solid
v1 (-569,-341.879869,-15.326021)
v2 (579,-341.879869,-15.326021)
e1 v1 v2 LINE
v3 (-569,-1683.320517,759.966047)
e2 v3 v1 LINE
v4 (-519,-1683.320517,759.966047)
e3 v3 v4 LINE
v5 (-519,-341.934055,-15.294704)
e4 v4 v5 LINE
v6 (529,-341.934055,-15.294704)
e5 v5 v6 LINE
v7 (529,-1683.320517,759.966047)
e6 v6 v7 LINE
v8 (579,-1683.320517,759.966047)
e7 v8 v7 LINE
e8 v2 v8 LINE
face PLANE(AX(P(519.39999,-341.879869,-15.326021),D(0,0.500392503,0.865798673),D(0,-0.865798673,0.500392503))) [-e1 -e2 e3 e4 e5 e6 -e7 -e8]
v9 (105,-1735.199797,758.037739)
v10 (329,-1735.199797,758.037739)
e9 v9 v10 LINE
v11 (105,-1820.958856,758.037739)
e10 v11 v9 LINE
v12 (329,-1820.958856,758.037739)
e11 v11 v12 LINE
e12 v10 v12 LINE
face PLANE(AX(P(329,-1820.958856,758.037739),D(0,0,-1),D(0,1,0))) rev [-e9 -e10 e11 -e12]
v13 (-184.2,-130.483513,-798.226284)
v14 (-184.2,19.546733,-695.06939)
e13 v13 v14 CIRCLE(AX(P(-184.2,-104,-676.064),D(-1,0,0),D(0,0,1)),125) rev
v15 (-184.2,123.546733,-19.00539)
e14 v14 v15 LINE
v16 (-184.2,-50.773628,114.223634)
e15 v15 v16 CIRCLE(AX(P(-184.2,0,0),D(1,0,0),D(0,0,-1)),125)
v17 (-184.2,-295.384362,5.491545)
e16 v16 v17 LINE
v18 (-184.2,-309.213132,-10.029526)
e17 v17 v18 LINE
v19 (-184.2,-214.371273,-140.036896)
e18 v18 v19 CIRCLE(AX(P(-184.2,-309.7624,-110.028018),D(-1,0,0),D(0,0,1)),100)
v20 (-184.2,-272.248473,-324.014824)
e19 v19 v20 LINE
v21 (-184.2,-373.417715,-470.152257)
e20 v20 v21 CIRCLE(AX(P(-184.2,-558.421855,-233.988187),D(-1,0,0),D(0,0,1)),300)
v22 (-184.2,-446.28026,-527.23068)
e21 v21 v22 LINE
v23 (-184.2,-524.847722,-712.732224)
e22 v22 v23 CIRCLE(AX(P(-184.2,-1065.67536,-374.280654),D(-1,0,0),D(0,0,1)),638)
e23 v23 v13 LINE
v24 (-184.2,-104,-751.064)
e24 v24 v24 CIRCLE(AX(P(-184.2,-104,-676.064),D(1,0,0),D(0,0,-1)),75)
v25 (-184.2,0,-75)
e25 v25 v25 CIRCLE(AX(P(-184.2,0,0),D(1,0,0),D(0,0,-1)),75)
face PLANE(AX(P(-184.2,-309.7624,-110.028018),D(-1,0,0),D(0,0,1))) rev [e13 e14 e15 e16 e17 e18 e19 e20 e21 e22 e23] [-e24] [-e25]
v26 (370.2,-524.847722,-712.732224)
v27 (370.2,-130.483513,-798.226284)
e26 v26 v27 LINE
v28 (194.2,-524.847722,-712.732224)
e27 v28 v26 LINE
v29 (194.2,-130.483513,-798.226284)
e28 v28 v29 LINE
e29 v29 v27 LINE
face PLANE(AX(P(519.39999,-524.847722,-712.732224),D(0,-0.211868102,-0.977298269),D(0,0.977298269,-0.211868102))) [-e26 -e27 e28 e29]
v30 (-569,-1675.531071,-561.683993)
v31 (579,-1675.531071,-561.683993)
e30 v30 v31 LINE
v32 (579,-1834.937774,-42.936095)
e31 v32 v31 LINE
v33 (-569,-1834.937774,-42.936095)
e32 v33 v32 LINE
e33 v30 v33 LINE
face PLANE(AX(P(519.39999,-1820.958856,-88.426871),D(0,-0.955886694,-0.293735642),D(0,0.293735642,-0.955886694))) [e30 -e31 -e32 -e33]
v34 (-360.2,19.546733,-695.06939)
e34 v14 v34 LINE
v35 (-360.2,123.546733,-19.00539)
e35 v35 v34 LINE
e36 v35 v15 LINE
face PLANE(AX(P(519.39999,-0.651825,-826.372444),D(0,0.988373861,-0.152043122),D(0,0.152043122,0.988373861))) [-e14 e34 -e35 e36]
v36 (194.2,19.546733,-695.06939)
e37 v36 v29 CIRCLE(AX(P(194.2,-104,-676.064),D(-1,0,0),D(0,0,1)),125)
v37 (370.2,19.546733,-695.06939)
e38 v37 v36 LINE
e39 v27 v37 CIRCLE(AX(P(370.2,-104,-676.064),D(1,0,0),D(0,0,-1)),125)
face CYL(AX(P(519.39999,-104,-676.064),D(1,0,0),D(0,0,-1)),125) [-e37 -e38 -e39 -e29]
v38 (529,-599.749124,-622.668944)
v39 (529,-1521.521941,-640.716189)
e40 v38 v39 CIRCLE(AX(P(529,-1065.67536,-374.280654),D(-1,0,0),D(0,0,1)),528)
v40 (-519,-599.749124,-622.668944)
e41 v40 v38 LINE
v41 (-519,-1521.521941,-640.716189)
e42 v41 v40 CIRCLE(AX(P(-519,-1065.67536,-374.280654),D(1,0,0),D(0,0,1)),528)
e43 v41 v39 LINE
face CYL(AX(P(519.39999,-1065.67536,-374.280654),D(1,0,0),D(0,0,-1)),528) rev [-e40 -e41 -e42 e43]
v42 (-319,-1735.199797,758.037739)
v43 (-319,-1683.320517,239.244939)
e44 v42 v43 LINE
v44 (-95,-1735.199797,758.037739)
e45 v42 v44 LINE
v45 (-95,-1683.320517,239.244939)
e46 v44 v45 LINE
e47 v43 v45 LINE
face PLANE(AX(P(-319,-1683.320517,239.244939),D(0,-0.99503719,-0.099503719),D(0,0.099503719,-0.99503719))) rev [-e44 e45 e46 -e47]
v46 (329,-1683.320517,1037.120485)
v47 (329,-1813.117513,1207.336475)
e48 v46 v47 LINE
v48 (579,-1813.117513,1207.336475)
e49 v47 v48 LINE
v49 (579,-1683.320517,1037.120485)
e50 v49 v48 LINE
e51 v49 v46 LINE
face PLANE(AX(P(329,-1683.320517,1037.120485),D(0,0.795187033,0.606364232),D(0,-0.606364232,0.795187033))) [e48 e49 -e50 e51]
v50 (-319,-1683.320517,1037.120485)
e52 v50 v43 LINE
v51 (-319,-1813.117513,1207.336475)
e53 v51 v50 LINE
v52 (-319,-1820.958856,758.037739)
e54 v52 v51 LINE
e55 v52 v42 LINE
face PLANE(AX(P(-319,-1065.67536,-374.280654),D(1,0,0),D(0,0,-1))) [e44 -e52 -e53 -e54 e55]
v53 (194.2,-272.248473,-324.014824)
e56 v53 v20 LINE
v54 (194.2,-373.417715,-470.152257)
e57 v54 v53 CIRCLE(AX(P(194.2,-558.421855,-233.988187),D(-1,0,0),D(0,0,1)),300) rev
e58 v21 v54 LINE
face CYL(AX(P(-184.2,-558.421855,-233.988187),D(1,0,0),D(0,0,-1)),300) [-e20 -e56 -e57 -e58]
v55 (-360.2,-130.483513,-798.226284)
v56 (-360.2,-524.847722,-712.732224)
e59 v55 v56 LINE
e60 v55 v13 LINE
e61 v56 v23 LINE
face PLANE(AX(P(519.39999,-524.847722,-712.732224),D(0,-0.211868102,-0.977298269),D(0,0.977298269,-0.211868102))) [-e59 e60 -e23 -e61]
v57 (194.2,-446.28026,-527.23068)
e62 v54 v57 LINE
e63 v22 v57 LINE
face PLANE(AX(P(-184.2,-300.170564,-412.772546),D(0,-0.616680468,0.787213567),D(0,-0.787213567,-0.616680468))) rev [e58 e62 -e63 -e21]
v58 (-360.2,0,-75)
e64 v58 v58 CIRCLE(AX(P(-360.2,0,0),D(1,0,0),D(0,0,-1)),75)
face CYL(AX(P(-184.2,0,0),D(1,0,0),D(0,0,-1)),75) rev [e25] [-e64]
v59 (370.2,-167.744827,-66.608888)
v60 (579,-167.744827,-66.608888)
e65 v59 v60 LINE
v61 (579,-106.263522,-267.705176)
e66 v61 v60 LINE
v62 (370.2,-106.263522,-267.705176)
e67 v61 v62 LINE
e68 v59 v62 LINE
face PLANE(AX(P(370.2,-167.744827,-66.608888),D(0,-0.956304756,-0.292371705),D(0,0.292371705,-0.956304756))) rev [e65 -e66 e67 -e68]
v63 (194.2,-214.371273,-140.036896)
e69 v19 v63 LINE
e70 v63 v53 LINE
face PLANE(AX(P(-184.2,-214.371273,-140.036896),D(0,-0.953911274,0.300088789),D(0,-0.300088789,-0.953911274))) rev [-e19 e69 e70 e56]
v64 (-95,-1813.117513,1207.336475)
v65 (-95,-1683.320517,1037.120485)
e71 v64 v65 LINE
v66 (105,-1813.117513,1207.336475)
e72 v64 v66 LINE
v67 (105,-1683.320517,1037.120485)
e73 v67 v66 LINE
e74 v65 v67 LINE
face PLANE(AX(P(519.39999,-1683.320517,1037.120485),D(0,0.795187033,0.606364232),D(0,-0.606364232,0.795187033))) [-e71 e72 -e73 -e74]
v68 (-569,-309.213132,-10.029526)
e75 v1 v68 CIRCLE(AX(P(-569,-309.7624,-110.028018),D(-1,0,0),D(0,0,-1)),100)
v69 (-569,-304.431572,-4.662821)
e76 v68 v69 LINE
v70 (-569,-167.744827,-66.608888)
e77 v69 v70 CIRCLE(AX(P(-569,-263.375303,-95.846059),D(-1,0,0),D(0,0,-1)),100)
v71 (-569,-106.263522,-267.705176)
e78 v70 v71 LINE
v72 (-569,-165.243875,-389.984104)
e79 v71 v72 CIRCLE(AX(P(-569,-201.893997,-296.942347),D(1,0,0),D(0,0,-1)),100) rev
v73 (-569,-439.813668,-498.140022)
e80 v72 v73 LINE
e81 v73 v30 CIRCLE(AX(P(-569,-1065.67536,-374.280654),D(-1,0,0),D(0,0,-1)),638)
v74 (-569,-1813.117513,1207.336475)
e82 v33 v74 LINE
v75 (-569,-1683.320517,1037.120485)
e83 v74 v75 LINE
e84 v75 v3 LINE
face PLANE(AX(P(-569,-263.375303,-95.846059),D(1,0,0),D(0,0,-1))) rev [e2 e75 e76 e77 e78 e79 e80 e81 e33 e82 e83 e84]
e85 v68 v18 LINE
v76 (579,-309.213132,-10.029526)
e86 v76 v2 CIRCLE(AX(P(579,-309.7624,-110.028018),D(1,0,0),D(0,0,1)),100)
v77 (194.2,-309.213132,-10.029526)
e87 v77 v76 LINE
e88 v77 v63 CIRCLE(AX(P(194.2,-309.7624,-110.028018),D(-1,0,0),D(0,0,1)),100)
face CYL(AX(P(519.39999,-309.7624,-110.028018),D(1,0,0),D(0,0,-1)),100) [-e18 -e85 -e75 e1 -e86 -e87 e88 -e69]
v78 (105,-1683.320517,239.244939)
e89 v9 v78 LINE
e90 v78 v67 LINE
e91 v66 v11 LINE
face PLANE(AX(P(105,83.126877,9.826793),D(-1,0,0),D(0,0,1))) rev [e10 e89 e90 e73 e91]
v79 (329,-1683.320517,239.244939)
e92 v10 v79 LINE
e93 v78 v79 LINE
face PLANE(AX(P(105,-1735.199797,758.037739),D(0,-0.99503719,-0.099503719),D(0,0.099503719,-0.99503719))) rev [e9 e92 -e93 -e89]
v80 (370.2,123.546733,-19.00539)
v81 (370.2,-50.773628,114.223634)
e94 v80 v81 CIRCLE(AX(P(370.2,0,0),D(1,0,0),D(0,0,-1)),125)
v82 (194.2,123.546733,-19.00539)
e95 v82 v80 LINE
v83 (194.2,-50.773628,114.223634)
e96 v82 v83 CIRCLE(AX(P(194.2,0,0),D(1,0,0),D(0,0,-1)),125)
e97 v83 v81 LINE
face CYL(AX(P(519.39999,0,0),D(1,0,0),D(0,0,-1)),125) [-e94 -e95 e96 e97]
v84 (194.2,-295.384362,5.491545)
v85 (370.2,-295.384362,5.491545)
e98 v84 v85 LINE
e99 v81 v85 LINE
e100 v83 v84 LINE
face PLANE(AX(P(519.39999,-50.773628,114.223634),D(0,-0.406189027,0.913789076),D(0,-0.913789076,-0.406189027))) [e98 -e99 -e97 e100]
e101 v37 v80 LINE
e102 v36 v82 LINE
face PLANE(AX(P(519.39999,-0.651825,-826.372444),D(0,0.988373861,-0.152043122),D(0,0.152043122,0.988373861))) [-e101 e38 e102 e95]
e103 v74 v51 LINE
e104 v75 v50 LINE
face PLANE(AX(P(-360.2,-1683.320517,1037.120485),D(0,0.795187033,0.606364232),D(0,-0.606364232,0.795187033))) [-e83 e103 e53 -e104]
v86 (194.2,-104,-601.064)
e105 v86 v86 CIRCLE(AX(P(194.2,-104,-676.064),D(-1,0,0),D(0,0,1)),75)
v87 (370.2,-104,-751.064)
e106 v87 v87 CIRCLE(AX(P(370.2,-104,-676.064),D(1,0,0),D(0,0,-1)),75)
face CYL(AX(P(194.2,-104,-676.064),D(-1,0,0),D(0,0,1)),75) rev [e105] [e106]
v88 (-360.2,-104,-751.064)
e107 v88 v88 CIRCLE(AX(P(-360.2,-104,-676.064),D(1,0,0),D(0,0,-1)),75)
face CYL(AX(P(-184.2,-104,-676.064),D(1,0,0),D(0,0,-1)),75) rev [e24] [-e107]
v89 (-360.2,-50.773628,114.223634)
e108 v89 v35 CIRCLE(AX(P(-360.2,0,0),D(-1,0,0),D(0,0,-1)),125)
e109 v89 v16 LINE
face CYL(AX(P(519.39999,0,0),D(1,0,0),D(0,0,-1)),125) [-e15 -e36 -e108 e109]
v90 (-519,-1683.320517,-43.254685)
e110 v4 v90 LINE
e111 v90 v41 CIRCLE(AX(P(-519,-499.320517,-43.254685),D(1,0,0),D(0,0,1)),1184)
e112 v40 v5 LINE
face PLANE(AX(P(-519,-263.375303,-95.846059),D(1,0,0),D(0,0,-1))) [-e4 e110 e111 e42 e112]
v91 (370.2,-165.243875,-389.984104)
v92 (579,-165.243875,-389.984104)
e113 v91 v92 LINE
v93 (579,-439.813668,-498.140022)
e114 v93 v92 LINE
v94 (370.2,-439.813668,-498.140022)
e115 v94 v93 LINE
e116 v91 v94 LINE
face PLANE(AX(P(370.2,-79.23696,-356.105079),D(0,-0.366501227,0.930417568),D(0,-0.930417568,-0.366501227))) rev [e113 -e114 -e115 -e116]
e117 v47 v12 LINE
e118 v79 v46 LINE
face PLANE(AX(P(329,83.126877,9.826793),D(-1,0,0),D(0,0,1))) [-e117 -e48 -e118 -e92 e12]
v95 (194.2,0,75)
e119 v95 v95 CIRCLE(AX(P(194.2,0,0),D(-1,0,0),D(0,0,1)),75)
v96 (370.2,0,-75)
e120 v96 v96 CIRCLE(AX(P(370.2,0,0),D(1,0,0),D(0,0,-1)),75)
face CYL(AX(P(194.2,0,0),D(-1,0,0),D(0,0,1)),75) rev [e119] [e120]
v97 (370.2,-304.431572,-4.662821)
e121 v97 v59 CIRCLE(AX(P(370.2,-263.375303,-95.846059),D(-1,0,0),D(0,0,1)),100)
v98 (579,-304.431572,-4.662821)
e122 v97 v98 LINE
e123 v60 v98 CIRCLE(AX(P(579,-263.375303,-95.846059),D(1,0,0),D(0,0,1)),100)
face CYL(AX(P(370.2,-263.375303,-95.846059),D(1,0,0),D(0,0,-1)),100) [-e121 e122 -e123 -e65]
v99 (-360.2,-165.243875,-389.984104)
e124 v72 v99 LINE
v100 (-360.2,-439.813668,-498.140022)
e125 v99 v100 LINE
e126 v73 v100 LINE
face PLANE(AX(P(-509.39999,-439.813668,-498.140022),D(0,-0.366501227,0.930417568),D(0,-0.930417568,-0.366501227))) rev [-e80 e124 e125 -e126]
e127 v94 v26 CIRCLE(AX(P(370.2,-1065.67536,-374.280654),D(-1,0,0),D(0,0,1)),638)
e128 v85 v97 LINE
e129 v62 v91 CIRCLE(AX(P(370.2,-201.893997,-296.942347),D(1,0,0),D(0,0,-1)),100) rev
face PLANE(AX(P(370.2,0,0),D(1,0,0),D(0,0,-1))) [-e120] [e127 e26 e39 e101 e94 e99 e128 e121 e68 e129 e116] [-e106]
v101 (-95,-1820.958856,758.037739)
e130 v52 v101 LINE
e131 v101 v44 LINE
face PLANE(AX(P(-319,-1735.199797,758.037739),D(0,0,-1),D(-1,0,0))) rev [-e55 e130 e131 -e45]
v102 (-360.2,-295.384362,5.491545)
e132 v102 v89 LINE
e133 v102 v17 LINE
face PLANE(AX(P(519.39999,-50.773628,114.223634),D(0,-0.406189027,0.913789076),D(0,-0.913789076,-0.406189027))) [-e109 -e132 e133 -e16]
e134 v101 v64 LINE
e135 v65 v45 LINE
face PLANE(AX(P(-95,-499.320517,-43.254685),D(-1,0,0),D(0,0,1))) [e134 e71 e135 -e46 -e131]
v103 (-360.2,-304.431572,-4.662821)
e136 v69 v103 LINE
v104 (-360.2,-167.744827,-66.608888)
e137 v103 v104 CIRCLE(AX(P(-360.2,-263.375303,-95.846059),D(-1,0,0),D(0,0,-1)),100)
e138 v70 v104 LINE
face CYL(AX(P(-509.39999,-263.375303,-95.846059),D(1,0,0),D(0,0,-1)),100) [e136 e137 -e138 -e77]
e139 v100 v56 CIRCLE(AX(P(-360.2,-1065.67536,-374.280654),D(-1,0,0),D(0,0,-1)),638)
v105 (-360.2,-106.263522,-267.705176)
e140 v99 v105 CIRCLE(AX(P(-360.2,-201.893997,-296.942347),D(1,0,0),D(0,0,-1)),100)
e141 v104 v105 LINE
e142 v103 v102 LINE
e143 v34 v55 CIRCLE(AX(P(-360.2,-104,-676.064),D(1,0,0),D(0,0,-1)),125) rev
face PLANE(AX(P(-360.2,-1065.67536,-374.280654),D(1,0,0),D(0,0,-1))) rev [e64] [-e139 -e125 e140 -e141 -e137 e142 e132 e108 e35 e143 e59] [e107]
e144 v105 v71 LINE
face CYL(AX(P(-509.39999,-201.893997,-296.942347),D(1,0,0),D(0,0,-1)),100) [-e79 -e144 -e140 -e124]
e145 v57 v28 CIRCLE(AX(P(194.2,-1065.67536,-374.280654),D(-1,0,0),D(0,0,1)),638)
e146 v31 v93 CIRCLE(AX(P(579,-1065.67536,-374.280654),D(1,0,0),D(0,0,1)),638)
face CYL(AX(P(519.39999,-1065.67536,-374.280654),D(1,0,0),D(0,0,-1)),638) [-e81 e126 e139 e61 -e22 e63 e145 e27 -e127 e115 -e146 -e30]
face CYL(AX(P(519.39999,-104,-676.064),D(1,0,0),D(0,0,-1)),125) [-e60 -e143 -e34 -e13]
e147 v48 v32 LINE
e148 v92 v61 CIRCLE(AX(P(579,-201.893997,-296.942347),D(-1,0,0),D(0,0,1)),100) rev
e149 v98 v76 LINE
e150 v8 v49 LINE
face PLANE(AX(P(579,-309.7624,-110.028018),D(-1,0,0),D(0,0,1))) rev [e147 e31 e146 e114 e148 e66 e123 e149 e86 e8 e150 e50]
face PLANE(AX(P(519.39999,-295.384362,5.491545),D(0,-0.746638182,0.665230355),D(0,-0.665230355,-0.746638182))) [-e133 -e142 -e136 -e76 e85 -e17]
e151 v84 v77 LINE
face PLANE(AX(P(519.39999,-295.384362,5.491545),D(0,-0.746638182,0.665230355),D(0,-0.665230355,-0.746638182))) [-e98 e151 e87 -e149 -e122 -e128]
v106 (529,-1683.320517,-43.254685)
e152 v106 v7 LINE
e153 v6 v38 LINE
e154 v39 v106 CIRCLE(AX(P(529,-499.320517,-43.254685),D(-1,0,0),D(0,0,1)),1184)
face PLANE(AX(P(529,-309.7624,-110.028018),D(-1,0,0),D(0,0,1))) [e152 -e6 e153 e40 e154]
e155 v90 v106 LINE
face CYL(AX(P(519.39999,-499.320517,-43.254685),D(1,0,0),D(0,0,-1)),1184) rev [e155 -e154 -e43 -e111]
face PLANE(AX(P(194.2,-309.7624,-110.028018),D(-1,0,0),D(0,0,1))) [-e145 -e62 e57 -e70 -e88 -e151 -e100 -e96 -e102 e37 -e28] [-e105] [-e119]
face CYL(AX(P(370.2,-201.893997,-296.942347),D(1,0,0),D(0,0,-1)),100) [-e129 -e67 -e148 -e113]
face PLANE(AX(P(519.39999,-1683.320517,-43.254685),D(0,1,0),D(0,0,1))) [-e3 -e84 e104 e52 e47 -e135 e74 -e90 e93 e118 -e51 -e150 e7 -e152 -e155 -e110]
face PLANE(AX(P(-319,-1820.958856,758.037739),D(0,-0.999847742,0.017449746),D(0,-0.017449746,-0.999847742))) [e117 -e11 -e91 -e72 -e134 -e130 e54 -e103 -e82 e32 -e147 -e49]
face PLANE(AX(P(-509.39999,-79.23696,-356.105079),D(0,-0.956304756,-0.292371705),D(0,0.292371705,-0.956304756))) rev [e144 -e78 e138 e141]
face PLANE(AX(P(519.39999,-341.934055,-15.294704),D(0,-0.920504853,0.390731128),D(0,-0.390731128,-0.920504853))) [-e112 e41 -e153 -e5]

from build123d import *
from build123d.topology import SkipClean

# Parameters (mm, degrees)
BOSS_EXTRUDE1_DEPTH   = 9.600009513678287
BOSS_EXTRUDE2_DEPTH   = 514.3999904863157
CUT_EXTRUDE1_DEPTH    = 199.99999999999986
CUT_EXTRUDE2_DEPTH    = 224.00000000000003
BOSS_EXTRUDE3_DEPTH   = 100.00000000000634
BOSS_EXTRUDE4_DEPTH   = 223.9999999999994
BOSS_EXTRUDE5_DEPTH   = 41.20000000000044
CUT_EXTRUDE3_DEPTH    = 158.79999999999976
BOSS_EXTRUDE6_DEPTH   = 149.19999048631087
CUT_EXTRUDE4_DEPTH    = 378.3999999999982
BOSS_EXTRUDE7_DEPTH   = 9.600009513685004
BOSS_EXTRUDE8_DEPTH   = 49.99999999999939
BOSS_EXTRUDE9_DEPTH   = 279.08274569611746
BOSS_EXTRUDE10_START  = 50.00000000000021
BOSS_EXTRUDE10_DEPTH  = 50.00000000000021
DRAFT1_START          = -793
DRAFT1_DEPTH          = 1150
DRAFT1_START_2        = -791.766847587
DRAFT1_2_DEPTH        = 1148
DRAFT2_ANGLE          = 52.67292498717598
HOLE1_AT_2_COUNT      = 2
HOLE1_AT_2_PITCH      = 684.016470632103
HOLE2_D               = 150
HOLE2_DEPTH           = 384.8
FILLET1_R             = 100.00000000000001
FILLET2_R             = 125
FILLET3_R             = 300
BODY_MOVE_COPY3_ANGLE = 90.0000000000002
BODY_MOVE_COPY4_ANGLE = 120.00000000000021


with BuildPart() as part:
    # Sketch1 → Boss-Extrude1 (new body)
    with BuildSketch(Plane.XY.offset(306.2331524125839)):
        with BuildLine():
            Line((53.08147760316467, -1766.447394034807), (-1027.2936921096916, -1766.4473940348073))
            Line((-1027.2936921096916, -1766.4473940348073), (-1027.2936921096916, -1904.0857327222143))
            Line((-1027.2936921096916, -1904.0857327222143), (98.25366379894766, -1904.0857327222143))
            Line((98.25366379894766, -1904.0857327222143), (571.5107857447487, -1758.657947920252))
            ThreePointArc((571.5107857447487, -1758.657947920252), (1016.6806746482655, -1231.839040201803), (722.5590166804343, -607.9745983313888))
            Line((722.5590166804343, -607.9745983313888), (836.1992361834356, -83.77870158177328))
            Line((836.1992361834356, -83.77870158177328), (28.832182943648764, 40.41985585796329))
            ThreePointArc((28.832182943648764, 40.41985585796329), (-89.48849099605702, -7.222499827583533), (-104.39684181466816, -133.9005050719176))
            Line((-104.39684181466816, -133.9005050719176), (4.335247948888093, -378.51123875566793))
            Line((4.335247948888093, -378.51123875566793), (19.856318658240184, -392.340008322466))
            ThreePointArc((19.856318658240184, -392.340008322466), (21.14387371916233, -408.89399605142665), (25.152813367140993, -425.0067459925245))
            Line((25.152813367140993, -425.0067459925245), (25.121496409919185, -425.06093181631854))
            Line((25.121496409919185, -425.06093181631854), (632.4957363404607, -682.8760006812848))
            ThreePointArc((632.4957363404607, -682.8760006812848), (912.0062760274534, -1138.4665882307247), (650.5429820351718, -1604.6488177874323))
            ThreePointArc((650.5429820351718, -1604.6488177874323), (362.57260370932397, -1725.2821339957313), (53.08147760316467, -1766.447394034807))
        make_face()
    extrude(amount=-BOSS_EXTRUDE1_DEPTH)

    # Sketch2 → Boss-Extrude2 (add)
    with SkipClean():  # the faces are left unmerged after this step: merging them gives an invalid solid
        with BuildSketch(Plane(origin=(0, 0, 296.6331428989056), x_dir=(-1, 0, 0), z_dir=(0, 0, -1))):
            with BuildLine():
                Line((-53.08147763303338, -1766.4473939156126), (1027.293692098456, -1766.4473939156126))
                Line((1027.293692098456, -1766.4473939156126), (1027.293692098456, -1904.0857326059793))
                Line((1027.293692098456, -1904.0857326059793), (-98.2536638101782, -1904.0857326059797))
                Line((-98.2536638101782, -1904.0857326059797), (-571.5107857559829, -1758.6579478040192))
                ThreePointArc((-571.5107857559829, -1758.6579478040192), (-1016.6806746151524, -1231.8390401398947), (-722.5590166804387, -607.9745983313868))
                Line((-722.5590166804387, -607.9745983313868), (-836.1992361834398, -83.77870158177345))
                Line((-836.1992361834398, -83.77870158177345), (-28.832182943652366, 40.41985585796323))
                ThreePointArc((-28.832182943652366, 40.41985585796323), (89.4884909960535, -7.222499827583732), (104.39684181466478, -133.90050507191813))
                Line((104.39684181466478, -133.90050507191813), (-4.335247948891731, -378.51123875566793))
                Line((-4.335247948891731, -378.51123875566793), (-19.856318658241946, -392.340008322466))
                ThreePointArc((-19.856318658241946, -392.340008322466), (-21.14387371916395, -408.8939960514259), (-25.152813367143864, -425.0067459925226))
                Line((-25.152813367143864, -425.0067459925226), (-25.121496409920812, -425.0609318163162))
                Line((-25.121496409920812, -425.0609318163162), (-632.4957363404753, -682.8760006812888))
                ThreePointArc((-632.4957363404753, -682.8760006812888), (-912.0062759939467, -1138.4665881761014), (-650.5429820330173, -1604.6488176769096))
                ThreePointArc((-650.5429820330173, -1604.6488176769096), (-362.57260372260464, -1725.282133878744), (-53.08147763303338, -1766.4473939156126))
            make_face()
        extrude(amount=BOSS_EXTRUDE2_DEPTH)

    # Sketch3 → Cut-Extrude1 (cut)
    with SkipClean():  # the faces are left unmerged after this step: merging them gives an invalid solid
        with BuildSketch(Plane.XY.offset(306.2331524125839)):
            Polygon((-1027.29369209846, -1904.085732605916), (-748.21094640232, -1904.0857326059318), (-748.2109464023167, -1766.44739383907), (-1027.2936920984598, -1766.4473938390806), align=None)
        extrude(amount=-CUT_EXTRUDE1_DEPTH, mode=Mode.SUBTRACT)

    # Sketch4 → Cut-Extrude2 (cut)
    with SkipClean():  # the faces are left unmerged after this step: merging them gives an invalid solid
        with BuildSketch(Plane.XY.offset(106.23315241258402)):
            Polygon((-229.4181464023195, -1766.4473938390802), (-1027.2936920984598, -1766.4473938390806), (-1027.29369209846, -1904.085732605916), (-748.21094640232, -1904.0857326059318), (-748.2109464023184, -1818.3266738390705), align=None)
        extrude(amount=-CUT_EXTRUDE2_DEPTH, mode=Mode.SUBTRACT)

    # Sketch5 → Boss-Extrude3 (add)
    with BuildSketch(Plane(origin=(0, 0, -217.7668475874101), x_dir=(-1, 0, 0), z_dir=(0, 0, -1))):
        with BuildLine():
            Line((-53.081477633029785, -1766.4473939156126), (1027.2936920984594, -1766.4473939156126))
            Line((1027.2936920984594, -1766.4473939156126), (1027.2936920984594, -1904.0857326059793))
            Line((1027.2936920984594, -1904.0857326059793), (-98.2536638101746, -1904.0857326059797))
            Line((-98.2536638101746, -1904.0857326059797), (-571.5107857559792, -1758.6579478040192))
            ThreePointArc((-571.5107857559792, -1758.6579478040192), (-1016.6806746151486, -1231.8390401398945), (-722.5590166804352, -607.9745983313868))
            Line((-722.5590166804352, -607.9745983313868), (-836.1992361834363, -83.77870158177345))
            Line((-836.1992361834363, -83.77870158177345), (-28.832182943648775, 40.41985585796323))
            ThreePointArc((-28.832182943648775, 40.41985585796323), (89.4884909960571, -7.222499827583732), (104.39684181466838, -133.90050507191813))
            Line((104.39684181466838, -133.90050507191813), (-4.3352479488881395, -378.51123875566793))
            Line((-4.3352479488881395, -378.51123875566793), (-19.856318658238703, -392.340008322466))
            ThreePointArc((-19.856318658238703, -392.340008322466), (-21.14387371916071, -408.89399605142586), (-25.152813367140272, -425.0067459925226))
            Line((-25.152813367140272, -425.0067459925226), (-25.12149640991722, -425.0609318163162))
            Line((-25.12149640991722, -425.0609318163162), (-632.4957363404717, -682.8760006812888))
            ThreePointArc((-632.4957363404717, -682.8760006812888), (-912.0062759939432, -1138.4665881761014), (-650.5429820330137, -1604.6488176769096))
            ThreePointArc((-650.5429820330137, -1604.6488176769096), (-362.57260372260106, -1725.282133878744), (-53.081477633029785, -1766.4473939156126))
        make_face()
    extrude(amount=BOSS_EXTRUDE3_DEPTH)

    # Sketch6 → Boss-Extrude4 (add)
    with SkipClean():  # the faces are left unmerged after this step: merging them gives an invalid solid
        with BuildSketch(Plane(origin=(0, 0, -317.76684758741646), x_dir=(-1, 0, 0), z_dir=(0, 0, -1))):
            with BuildLine():
                Line((-53.081477633029195, -1766.4473939156128), (229.4181463204047, -1766.4473939156128))
                Line((229.4181463204047, -1766.4473939156128), (748.2109463203855, -1818.3266739156131))
                Line((748.2109463203855, -1818.3266739156131), (748.2109463203855, -1904.0857326059795))
                Line((748.2109463203855, -1904.0857326059795), (-98.2536638101739, -1904.0857326059797))
                Line((-98.2536638101739, -1904.0857326059797), (-571.5107857559785, -1758.6579478040192))
                ThreePointArc((-571.5107857559785, -1758.6579478040192), (-1016.6806746151481, -1231.8390401398947), (-722.5590166804345, -607.9745983313868))
                Line((-722.5590166804345, -607.9745983313868), (-836.1992361834356, -83.77870158177345))
                Line((-836.1992361834356, -83.77870158177345), (-28.83218294364808, 40.41985585796323))
                ThreePointArc((-28.83218294364808, 40.41985585796323), (89.48849099605779, -7.222499827583732), (104.39684181466907, -133.90050507191813))
                Line((104.39684181466907, -133.90050507191813), (-4.335247948887441, -378.51123875566793))
                Line((-4.335247948887441, -378.51123875566793), (-19.856318658238788, -392.340008322466))
                ThreePointArc((-19.856318658238788, -392.340008322466), (-21.14387371916078, -408.89399605142575), (-25.152813367139576, -425.0067459925226))
                Line((-25.152813367139576, -425.0067459925226), (-25.121496409916524, -425.0609318163162))
                Line((-25.121496409916524, -425.0609318163162), (-632.4957363404711, -682.8760006812888))
                ThreePointArc((-632.4957363404711, -682.8760006812888), (-912.0062759939424, -1138.4665881761016), (-650.5429820330128, -1604.6488176769099))
                ThreePointArc((-650.5429820330128, -1604.6488176769099), (-362.5726037226002, -1725.282133878744), (-53.081477633029195, -1766.4473939156128))
            make_face()
        extrude(amount=BOSS_EXTRUDE4_DEPTH)

    # Sketch7 → Boss-Extrude5 (add)
    with BuildSketch(Plane(origin=(0, 0, -541.7668475874159), x_dir=(-1, 0, 0), z_dir=(0, 0, -1))):
        with BuildLine():
            Line((-722.5590166804329, -607.9745983313868), (-836.1992361834341, -83.77870158177345))
            Line((-836.1992361834341, -83.77870158177345), (-28.83218294364651, 40.41985585796323))
            ThreePointArc((-28.83218294364651, 40.41985585796323), (89.48849099605935, -7.222499827583732), (104.39684181467064, -133.90050507191813))
            Line((104.39684181467064, -133.90050507191813), (-4.335247948885877, -378.51123875566793))
            Line((-4.335247948885877, -378.51123875566793), (-19.856318658237367, -392.340008322466))
            ThreePointArc((-19.856318658237367, -392.340008322466), (-21.14387371915936, -408.89399605142575), (-25.15281336713801, -425.0067459925226))
            Line((-25.15281336713801, -425.0067459925226), (-25.12149640991496, -425.0609318163162))
            Line((-25.12149640991496, -425.0609318163162), (-632.4957363404695, -682.8760006812888))
            ThreePointArc((-632.4957363404695, -682.8760006812888), (-912.0062759939407, -1138.4665881761018), (-650.5429820330108, -1604.6488176769099))
            ThreePointArc((-650.5429820330108, -1604.6488176769099), (-362.57260372259833, -1725.282133878744), (-53.081477633027575, -1766.4473939156126))
            Line((-53.081477633027575, -1766.4473939156126), (1027.2936920984582, -1766.4473939156126))
            Line((1027.2936920984582, -1766.4473939156126), (1027.2936920984582, -1904.0857326059793))
            Line((1027.2936920984582, -1904.0857326059793), (-98.25366381017234, -1904.0857326059797))
            Line((-98.25366381017234, -1904.0857326059797), (-571.510785755977, -1758.6579478040192))
            ThreePointArc((-571.510785755977, -1758.6579478040192), (-1016.6806746151462, -1231.8390401398947), (-722.5590166804329, -607.9745983313868))
        make_face()
    extrude(amount=BOSS_EXTRUDE5_DEPTH)

    # Sketch8 → Cut-Extrude3 (cut)
    with BuildSketch(Plane.XY.offset(306.2331524125839)):
        with BuildLine():
            Line((-104.39684181466816, -133.9005050719176), (4.335247948888093, -378.51123875566793))
            Line((4.335247948888093, -378.51123875566793), (14.489613985965955, -387.5584488775228))
            ThreePointArc((14.489613985965955, -387.5584488775228), (14.590003133143597, -305.2236767235862), (76.43568070724513, -250.87170390730495))
            Line((76.43568070724513, -250.87170390730495), (365.9318713497288, -162.3638362624787))
            Line((365.9318713497288, -162.3638362624787), (507.9668142543914, -522.9405451781555))
            ThreePointArc((507.9668142543914, -522.9405451781555), (619.1405258320616, -555.6720221138472), (722.5590166804343, -607.9745983313888))
            Line((722.5590166804343, -607.9745983313888), (836.1992361834356, -83.77870158177328))
            Line((836.1992361834356, -83.77870158177328), (28.832182943648764, 40.41985585796329))
            ThreePointArc((28.832182943648764, 40.41985585796329), (-89.48849099605702, -7.222499827583533), (-104.39684181466816, -133.9005050719176))
        make_face()
    extrude(amount=-CUT_EXTRUDE3_DEPTH, mode=Mode.SUBTRACT)

    # Sketch9 → Boss-Extrude6 (add)
    with BuildSketch(Plane(origin=(0, 0, -582.9668475874164), x_dir=(-1, 0, 0), z_dir=(0, 0, -1))):
        with BuildLine():
            Line((-25.1528133969194, -425.00674593665815), (-25.121496439696347, -425.0609317604518))
            Line((-25.121496439696347, -425.0609317604518), (-632.4957363702508, -682.8760006254245))
            ThreePointArc((-632.4957363702508, -682.8760006254245), (-912.0062760572353, -1138.4665881748622), (-650.5429820649566, -1604.6488177315662))
            ThreePointArc((-650.5429820649566, -1604.6488177315662), (-362.5726037391466, -1725.2821339398504), (-53.08147763302735, -1766.4473939789204))
            Line((-53.08147763302735, -1766.4473939789204), (1027.2936920984585, -1766.4473939789204))
            Line((1027.2936920984585, -1766.4473939789204), (1027.2936920984585, -1904.0857326059793))
            Line((1027.2936920984585, -1904.0857326059793), (-98.25366381017204, -1904.0857326059797))
            Line((-98.25366381017204, -1904.0857326059797), (-571.5107857559767, -1758.6579478040192))
            ThreePointArc((-571.5107857559767, -1758.6579478040192), (-1021.2655844178603, -1116.037821102927), (-507.96681425438925, -522.9405451781541))
            Line((-507.96681425438925, -522.9405451781541), (-365.93187134972715, -162.36383626247863))
            Line((-365.93187134972715, -162.36383626247863), (-76.43568075553172, -250.8717038925416))
            ThreePointArc((-76.43568075553172, -250.8717038925416), (-14.59000319073344, -305.2236766882949), (-14.48961401574584, -387.55844882165815))
            Line((-14.48961401574584, -387.55844882165815), (-19.856318688019385, -392.3400082666016))
            ThreePointArc((-19.856318688019385, -392.3400082666016), (-21.143873748941374, -408.89399599556117), (-25.1528133969194, -425.00674593665815))
        make_face()
    extrude(amount=BOSS_EXTRUDE6_DEPTH)

    # Sketch10 → Cut-Extrude4 (cut)
    with BuildSketch(Plane.XY.offset(-28.56684758741631)):
        with BuildLine():
            Line((149.86368907718216, -297.4981497888479), (422.5993383847587, -383.2974405420883))
            Line((422.5993383847587, -383.2974405420883), (537.0574725944384, -529.407137109236))
            ThreePointArc((537.0574725944384, -529.407137109236), (632.9288557363569, -561.3229552494635), (722.5590166804348, -607.9745983313883))
            Line((722.5590166804348, -607.9745983313883), (836.1992361834361, -83.77870158177348))
            Line((836.1992361834361, -83.77870158177348), (28.832182943648167, 40.41985585796329))
            ThreePointArc((28.832182943648167, 40.41985585796329), (-89.48849099605714, -7.222499827583846), (-104.39684181466868, -133.90050507191796))
            Line((-104.39684181466868, -133.90050507191796), (4.335247948887403, -378.5112387556677))
            Line((4.335247948887403, -378.5112387556677), (19.85631865823901, -392.34000832246596))
            ThreePointArc((19.85631865823901, -392.34000832246596), (60.919413328362104, -312.1017843461267), (149.86368907718216, -297.4981497888479))
        make_face()
    extrude(amount=-CUT_EXTRUDE4_DEPTH, mode=Mode.SUBTRACT)

    # Sketch11 → Boss-Extrude7 (add)
    with BuildSketch(Plane(origin=(0, 0, -732.1668380737271), x_dir=(-1, 0, 0), z_dir=(0, 0, -1))):
        with BuildLine():
            Line((-25.152813396918305, -425.00674593665826), (-25.121496439695253, -425.0609317604519))
            Line((-25.121496439695253, -425.0609317604519), (-632.4957363702498, -682.8760006254246))
            ThreePointArc((-632.4957363702498, -682.8760006254246), (-912.006276057234, -1138.4665881748624), (-650.5429820649556, -1604.6488177315662))
            ThreePointArc((-650.5429820649556, -1604.6488177315662), (-362.5726037391455, -1725.2821339398504), (-53.08147763302631, -1766.4473939789204))
            Line((-53.08147763302631, -1766.4473939789204), (1027.2936920984596, -1766.4473939789204))
            Line((1027.2936920984596, -1766.4473939789204), (1027.2936920984596, -1904.0857326059793))
            Line((1027.2936920984596, -1904.0857326059793), (-98.253663810171, -1904.0857326059797))
            Line((-98.253663810171, -1904.0857326059797), (-571.5107857559757, -1758.6579478040192))
            ThreePointArc((-571.5107857559757, -1758.6579478040192), (-1021.2655844178593, -1116.037821102927), (-507.9668142543883, -522.9405451781541))
            Line((-507.9668142543883, -522.9405451781541), (-365.9318713497261, -162.36383626247863))
            Line((-365.9318713497261, -162.36383626247863), (-76.43568075553054, -250.87170389254166))
            ThreePointArc((-76.43568075553054, -250.87170389254166), (-14.590003190732247, -305.223676688295), (-14.489614015744714, -387.55844882165826))
            Line((-14.489614015744714, -387.55844882165826), (-19.856318688018295, -392.3400082666017))
            ThreePointArc((-19.856318688018295, -392.3400082666017), (-21.14387374894028, -408.8939959955613), (-25.152813396918305, -425.00674593665826))
        make_face()
    extrude(amount=BOSS_EXTRUDE7_DEPTH)

    # Sketch12 → Boss-Extrude8 (add)
    with SkipClean():  # the faces are left unmerged after this step: merging them gives an invalid solid
        with BuildSketch(Plane(origin=(0, 0, -741.7668475874121), x_dir=(-1, 0, 0), z_dir=(0, 0, -1))):
            with BuildLine():
                Line((-365.93187134972607, -162.36383626247863), (-76.4356807072422, -250.8717039073049))
                ThreePointArc((-76.4356807072422, -250.8717039073049), (-14.590003133141124, -305.2236767235862), (-14.489613985962942, -387.55844887752255))
                Line((-14.489613985962942, -387.55844887752255), (-19.85631865823669, -392.3400083224661))
                ThreePointArc((-19.85631865823669, -392.3400083224661), (-21.143873719158677, -408.89399605142563), (-25.152813367136616, -425.0067459925226))
                Line((-25.152813367136616, -425.0067459925226), (750.1392546412519, -1766.4473938390702))
                Line((750.1392546412519, -1766.4473938390702), (1027.293692098458, -1766.4473938390702))
                Line((1027.293692098458, -1766.4473938390702), (1027.2936920984596, -1904.0857326059793))
                Line((1027.2936920984596, -1904.0857326059793), (-98.25366381017093, -1904.0857326059797))
                Line((-98.25366381017093, -1904.0857326059797), (-571.5107857559756, -1758.6579478040192))
                ThreePointArc((-571.5107857559756, -1758.6579478040192), (-1021.2655844178594, -1116.037821102927), (-507.96681425438817, -522.9405451781541))
                Line((-507.96681425438817, -522.9405451781541), (-365.93187134972607, -162.36383626247863))
            make_face()
        extrude(amount=BOSS_EXTRUDE8_DEPTH)

    # Sketch13 → Boss-Extrude9 (add)
    with BuildSketch(Plane.ZY.offset(748.2109464022755)):
        Polygon((306.2331524125839, -1904.0857326059336), (106.23315241258402, -1904.0857326059336), (106.23315241258602, -1766.4473938391052), (306.23315241258393, -1766.4473938390927), align=None)
    extrude(amount=BOSS_EXTRUDE9_DEPTH)

    # Sketch14 → Boss-Extrude10 (add)
    with BuildSketch(Plane.XY.offset(306.2331524125839).offset(BOSS_EXTRUDE10_START)):
        with BuildLine():
            Line((19.85631865824079, -392.3400083224026), (14.48961398596682, -387.5584488774589))
            ThreePointArc((14.48961398596682, -387.5584488774589), (14.590003133144805, -305.22367672352243), (76.43568070724626, -250.8717039072411))
            Line((76.43568070724626, -250.8717039072411), (365.93187134972885, -162.3638362624152))
            Line((365.93187134972885, -162.3638362624152), (507.9668142543918, -522.9405451780918))
            ThreePointArc((507.9668142543918, -522.9405451780918), (1021.265584417858, -1116.0378211028633), (571.51078575598, -1758.6579478039534))
            Line((571.51078575598, -1758.6579478039534), (98.25366381017913, -1904.0857326059158))
            Line((98.25366381017913, -1904.0857326059158), (-1027.2936920984382, -1904.085732605916))
            Line((-1027.2936920984382, -1904.085732605916), (-1027.2936920984382, -1766.4473938390063))
            Line((-1027.2936920984382, -1766.4473938390063), (-750.1392546412476, -1766.4473938390065))
            Line((-750.1392546412476, -1766.4473938390065), (25.152813367141405, -425.006745992461))
            ThreePointArc((25.152813367141405, -425.006745992461), (21.14387371916291, -408.89399605136316), (19.85631865824079, -392.3400083224026))
        make_face()
    extrude(amount=-BOSS_EXTRUDE10_DEPTH)

    # Draft1: read off the stored shape, not the designer's step
    # Draft1 outline → Draft1 (cut)
    with BuildSketch(Plane.XY.offset(DRAFT1_START)):
        Polygon((-748.210939686, -1904.085732722), (-1027.293692098, -1899.215067885), (-1027.29369211, -1904.085732606), align=None)
    extrude(amount=DRAFT1_DEPTH, mode=Mode.SUBTRACT)

    # Draft1 2 outline → Draft1 2 (add)
    with BuildSketch(Plane.XY.offset(DRAFT1_START_2)):
        Polygon((98.25366381, -1904.085732722), (-748.210939686, -1904.085732722), (52.762887679, -1918.064651242), align=None)
    extrude(amount=DRAFT1_2_DEPTH)

    # Draft2
    draft2_faces = [part.faces().sort_by_distance(p)[0] for p in [
        (-1027.2936920984582, -1832.831230907224, -666.7668475977032),
        (-1027.2936920984357, -1832.831230862022, 231.23315241259633),
        (-1027.293692098456, -1832.831230881173, -217.766847577809),
    ]]
    draft(draft2_faces, Plane(origin=(53.08147760316467, -1766.447394034807, 296.6331428989056), x_dir=(1, 2.1e-16, 0), z_dir=(-2.1e-16, 1, 0)), DRAFT2_ANGLE)

    # Sketch15 → Hole1 (revolve, cut)
    with BuildSketch(Plane(origin=(9.826792637787367, -83.1268767549308, -406.9668475874145), x_dir=(0, -1, 0), z_dir=(1, 0, 0))):
        Polygon((0, 0), (0, 384.79999999999706), (74.99999999999999, 384.79999999999706), (75.00000000000003, 7.96e-15), align=None)
    hole1 = revolve(axis=Axis((9.826792637787367, -83.1268767549308, -516.9668475874146), (0, 0, 1)), mode=Mode.SUBTRACT)

    # Hole1 at 2: Hole1 ×2
    with Locations(*[Vector(0.9883738609031518, -0.15204312244688098, 0) * (i * HOLE1_AT_2_PITCH) for i in range(1, HOLE1_AT_2_COUNT)]):
        add(hole1, mode=Mode.SUBTRACT)

    # Hole2
    with Locations(Plane(origin=(0, 0, -28.56684758741631), x_dir=(-1, 0, 0), z_dir=(0, 0, -1))):
        with Locations((-685.890792638, -187.126876755), (-9.826792638, -83.126876755)):
            Hole(HOLE2_D / 2, depth=HOLE2_DEPTH)

    # Fillet1
    fillet1_edges = [part.edges().sort_by_distance(p)[0] for p in [
        (365.9318713497288, -162.36383626244697, 251.83315241258413),
        (365.93187134972663, -162.36383626247863, -687.366847587414),
    ]]
    fillet(fillet1_edges, radius=FILLET1_R)

    # Fillet2
    fillet2_edges = [part.edges().sort_by_distance(p)[0] for p in [
        (836.1992361834342, -83.77870158177343, -494.9668475874155),
        (836.1992361834351, -83.77870158177332, 59.43315241258392),
    ]]
    fillet(fillet2_edges, radius=FILLET2_R)

    # Fillet3
    fillet3_edges = [part.edges().sort_by_distance(p)[0] for p in [
        (422.5993383847587, -383.2974405420883, -217.7668475874154),
    ]]
    fillet(fillet3_edges, radius=FILLET3_R)


with BuildPart() as part_1:
    # Body-Move/Copy1: read off the stored shape, not the designer's step
    # Body-Move/Copy1: moved
    add(part.part.moved(Location((-9.8267926, 83.1268768, 0))))


with BuildPart() as part_2:
    # Body-Move/Copy2: read off the stored shape, not the designer's step
    # Body-Move/Copy2: moved
    add(part_1.part.moved(Location((0, 0, 222.7668476))))


with BuildPart() as part_3:
    # Body-Move/Copy3: moved
    add(part_2.part.rotate(Axis((0, 0, 0), (0, 0, -1)), BODY_MOVE_COPY3_ANGLE))


with BuildPart() as part_4:
    # Body-Move/Copy4: moved
    add(part_3.part.rotate(Axis((0, 0, 0), (0.5773502691896252, 0.5773502691896252, 0.5773502691896272)), BODY_MOVE_COPY4_ANGLE))


solid = part_4.part
